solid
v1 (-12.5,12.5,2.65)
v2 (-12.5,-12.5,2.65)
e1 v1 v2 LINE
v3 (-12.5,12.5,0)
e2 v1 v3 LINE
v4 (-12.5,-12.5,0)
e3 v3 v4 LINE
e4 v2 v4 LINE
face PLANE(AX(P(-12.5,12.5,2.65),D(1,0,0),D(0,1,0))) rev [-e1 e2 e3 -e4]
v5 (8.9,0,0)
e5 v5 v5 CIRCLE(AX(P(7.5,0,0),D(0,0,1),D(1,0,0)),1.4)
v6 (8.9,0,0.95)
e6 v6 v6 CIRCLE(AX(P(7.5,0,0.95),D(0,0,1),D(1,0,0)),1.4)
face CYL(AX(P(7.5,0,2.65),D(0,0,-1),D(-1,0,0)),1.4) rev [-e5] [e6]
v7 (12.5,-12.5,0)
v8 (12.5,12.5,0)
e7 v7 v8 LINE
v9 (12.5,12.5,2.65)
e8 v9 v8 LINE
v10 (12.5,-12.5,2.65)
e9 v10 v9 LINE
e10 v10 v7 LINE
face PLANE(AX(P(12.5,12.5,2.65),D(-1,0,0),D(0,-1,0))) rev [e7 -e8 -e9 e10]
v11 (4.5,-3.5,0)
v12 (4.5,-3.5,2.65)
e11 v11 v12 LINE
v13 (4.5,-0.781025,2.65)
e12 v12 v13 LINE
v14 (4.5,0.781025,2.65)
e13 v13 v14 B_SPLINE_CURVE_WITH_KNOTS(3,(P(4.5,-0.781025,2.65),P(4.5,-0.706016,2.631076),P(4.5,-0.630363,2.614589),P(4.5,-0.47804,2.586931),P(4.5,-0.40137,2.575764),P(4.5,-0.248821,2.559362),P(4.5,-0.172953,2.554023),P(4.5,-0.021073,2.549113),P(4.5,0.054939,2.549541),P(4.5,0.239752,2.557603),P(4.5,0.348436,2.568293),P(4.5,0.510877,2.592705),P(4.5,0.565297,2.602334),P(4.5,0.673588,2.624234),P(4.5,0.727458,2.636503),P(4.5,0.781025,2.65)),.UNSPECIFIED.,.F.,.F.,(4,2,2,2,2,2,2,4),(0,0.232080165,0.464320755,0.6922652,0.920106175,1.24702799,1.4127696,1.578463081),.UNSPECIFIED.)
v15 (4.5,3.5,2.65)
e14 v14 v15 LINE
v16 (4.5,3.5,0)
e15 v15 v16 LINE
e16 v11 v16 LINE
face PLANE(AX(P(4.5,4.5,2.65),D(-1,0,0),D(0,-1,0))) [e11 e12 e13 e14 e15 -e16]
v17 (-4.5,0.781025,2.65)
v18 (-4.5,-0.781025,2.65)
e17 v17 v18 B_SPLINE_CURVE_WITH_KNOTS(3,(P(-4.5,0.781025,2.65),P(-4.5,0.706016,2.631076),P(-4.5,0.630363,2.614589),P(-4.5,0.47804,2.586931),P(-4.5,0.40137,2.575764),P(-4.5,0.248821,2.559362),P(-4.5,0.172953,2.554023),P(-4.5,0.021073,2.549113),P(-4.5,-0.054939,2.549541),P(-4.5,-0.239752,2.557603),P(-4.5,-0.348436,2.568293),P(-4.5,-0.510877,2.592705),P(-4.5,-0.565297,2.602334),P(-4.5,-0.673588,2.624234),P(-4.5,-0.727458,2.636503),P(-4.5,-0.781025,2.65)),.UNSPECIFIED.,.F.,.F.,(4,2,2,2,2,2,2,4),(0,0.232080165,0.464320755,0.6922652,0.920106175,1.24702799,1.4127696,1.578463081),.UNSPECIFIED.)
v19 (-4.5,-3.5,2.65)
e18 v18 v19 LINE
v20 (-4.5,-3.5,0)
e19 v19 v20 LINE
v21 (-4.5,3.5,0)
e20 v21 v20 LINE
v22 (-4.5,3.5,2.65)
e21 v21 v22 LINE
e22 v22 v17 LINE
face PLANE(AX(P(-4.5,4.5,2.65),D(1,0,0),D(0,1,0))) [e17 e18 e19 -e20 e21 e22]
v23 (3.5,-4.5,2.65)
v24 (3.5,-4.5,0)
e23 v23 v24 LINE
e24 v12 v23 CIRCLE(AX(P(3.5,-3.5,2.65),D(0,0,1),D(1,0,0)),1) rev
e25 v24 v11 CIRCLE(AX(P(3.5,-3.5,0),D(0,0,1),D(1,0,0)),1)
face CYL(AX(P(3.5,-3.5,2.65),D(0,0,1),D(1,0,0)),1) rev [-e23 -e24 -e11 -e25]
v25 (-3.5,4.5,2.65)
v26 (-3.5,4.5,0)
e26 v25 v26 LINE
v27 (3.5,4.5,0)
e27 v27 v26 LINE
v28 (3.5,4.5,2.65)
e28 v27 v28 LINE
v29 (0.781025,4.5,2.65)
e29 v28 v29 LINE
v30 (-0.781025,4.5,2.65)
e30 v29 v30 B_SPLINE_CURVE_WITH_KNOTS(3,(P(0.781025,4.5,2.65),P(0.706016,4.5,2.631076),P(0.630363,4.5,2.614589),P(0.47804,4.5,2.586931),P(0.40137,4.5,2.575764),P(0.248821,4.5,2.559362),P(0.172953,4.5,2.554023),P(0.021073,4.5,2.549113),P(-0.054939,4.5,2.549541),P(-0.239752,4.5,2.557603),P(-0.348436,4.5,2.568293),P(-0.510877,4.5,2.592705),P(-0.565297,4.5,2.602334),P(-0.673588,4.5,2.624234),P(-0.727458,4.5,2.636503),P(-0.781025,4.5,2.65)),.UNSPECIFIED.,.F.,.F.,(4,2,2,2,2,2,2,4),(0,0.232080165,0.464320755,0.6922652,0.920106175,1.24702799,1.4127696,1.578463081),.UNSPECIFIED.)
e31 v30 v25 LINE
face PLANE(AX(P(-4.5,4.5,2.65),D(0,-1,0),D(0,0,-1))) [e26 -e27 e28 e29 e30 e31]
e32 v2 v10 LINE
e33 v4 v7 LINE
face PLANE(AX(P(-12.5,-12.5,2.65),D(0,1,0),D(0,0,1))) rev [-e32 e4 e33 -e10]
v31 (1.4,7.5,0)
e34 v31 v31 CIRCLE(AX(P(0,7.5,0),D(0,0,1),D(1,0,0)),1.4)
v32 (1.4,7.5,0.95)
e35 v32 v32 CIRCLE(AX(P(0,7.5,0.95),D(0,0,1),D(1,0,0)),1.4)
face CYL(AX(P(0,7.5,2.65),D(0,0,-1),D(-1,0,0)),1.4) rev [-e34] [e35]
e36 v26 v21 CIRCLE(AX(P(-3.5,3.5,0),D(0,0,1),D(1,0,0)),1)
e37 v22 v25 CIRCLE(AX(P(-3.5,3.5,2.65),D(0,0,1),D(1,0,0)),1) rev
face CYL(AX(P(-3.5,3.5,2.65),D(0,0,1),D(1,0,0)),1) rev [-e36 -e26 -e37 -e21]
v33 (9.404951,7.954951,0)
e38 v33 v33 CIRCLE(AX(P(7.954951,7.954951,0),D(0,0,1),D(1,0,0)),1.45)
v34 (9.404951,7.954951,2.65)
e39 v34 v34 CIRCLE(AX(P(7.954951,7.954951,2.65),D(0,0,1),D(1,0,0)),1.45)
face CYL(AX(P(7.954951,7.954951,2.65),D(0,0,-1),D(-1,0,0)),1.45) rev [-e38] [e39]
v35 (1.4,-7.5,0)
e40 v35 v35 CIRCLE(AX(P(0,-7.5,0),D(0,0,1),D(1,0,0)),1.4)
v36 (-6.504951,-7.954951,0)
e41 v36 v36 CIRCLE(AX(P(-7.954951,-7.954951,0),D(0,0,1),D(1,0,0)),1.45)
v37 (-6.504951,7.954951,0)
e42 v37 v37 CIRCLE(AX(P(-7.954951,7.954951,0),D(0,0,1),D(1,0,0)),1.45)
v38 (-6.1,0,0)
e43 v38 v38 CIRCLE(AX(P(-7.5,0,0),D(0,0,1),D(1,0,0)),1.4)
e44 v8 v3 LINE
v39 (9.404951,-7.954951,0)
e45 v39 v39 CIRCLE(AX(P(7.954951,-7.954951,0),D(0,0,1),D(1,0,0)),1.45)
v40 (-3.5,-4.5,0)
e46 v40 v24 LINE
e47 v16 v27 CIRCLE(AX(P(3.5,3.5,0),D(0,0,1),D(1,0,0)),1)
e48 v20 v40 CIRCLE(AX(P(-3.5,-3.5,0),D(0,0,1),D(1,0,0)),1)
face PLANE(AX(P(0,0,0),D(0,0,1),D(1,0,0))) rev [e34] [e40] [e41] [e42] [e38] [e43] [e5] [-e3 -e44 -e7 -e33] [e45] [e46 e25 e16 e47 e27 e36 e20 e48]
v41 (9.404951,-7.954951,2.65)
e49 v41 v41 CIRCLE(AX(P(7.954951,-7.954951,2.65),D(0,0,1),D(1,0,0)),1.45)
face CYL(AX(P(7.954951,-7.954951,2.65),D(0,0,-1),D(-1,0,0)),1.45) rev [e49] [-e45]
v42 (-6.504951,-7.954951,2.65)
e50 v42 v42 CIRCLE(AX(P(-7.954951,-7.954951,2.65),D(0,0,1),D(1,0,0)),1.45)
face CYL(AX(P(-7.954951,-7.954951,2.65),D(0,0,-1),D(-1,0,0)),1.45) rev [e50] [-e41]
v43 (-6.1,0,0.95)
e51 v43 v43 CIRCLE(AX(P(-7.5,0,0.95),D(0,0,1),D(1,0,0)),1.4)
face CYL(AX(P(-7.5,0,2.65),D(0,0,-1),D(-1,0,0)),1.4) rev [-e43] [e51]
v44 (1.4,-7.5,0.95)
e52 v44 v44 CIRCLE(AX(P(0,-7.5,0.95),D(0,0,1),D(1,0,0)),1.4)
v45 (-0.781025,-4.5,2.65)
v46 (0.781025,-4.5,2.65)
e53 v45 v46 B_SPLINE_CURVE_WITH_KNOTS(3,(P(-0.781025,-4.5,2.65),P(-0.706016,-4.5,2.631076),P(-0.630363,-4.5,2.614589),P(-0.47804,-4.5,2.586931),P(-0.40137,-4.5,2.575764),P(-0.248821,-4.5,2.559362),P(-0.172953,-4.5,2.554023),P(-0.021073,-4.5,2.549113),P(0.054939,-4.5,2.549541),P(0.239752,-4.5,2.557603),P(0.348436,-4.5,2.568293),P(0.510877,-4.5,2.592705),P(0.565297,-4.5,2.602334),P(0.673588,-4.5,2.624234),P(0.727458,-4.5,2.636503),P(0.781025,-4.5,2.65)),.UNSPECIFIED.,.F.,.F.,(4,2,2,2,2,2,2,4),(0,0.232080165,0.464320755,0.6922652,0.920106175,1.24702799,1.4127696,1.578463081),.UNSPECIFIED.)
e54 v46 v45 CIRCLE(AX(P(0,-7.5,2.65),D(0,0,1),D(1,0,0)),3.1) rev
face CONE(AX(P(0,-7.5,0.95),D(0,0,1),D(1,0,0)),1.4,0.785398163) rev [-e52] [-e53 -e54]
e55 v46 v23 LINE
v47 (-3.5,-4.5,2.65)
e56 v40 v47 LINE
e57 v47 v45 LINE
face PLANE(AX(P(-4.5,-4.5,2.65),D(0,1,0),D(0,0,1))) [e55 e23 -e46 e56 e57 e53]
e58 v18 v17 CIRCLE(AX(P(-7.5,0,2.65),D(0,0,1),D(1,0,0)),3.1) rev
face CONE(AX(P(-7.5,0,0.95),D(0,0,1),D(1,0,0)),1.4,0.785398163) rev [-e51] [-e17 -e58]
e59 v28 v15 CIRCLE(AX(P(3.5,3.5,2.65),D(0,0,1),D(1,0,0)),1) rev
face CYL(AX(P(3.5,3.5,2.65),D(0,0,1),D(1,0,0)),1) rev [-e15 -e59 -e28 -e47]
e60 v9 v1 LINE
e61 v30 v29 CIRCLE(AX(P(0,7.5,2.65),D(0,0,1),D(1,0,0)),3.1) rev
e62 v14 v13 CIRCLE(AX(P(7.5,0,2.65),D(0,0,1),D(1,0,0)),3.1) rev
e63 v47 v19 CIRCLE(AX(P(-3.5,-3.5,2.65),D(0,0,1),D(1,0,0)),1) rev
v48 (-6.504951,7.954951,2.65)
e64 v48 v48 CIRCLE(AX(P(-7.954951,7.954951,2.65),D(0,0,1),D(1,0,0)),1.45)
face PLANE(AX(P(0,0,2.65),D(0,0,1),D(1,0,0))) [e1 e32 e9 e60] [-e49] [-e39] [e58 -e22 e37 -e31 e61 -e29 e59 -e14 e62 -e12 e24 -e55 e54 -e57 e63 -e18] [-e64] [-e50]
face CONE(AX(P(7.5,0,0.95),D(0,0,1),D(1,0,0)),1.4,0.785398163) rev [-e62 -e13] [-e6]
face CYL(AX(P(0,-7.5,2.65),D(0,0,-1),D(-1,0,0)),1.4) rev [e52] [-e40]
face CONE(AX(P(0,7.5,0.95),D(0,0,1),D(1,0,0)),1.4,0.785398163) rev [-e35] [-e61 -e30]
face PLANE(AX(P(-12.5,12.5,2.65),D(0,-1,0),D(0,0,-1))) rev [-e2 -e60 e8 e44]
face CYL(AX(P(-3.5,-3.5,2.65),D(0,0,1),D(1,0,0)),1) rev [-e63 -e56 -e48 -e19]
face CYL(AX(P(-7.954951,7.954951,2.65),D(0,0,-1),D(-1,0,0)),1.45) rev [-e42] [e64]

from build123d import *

# Parameters (mm, degrees)
SKETCH_1_W      = 25
SKETCH_1_H      = 25
SKETCH_1_R      = 1.4
SKETCH_1_R_2    = 1.45
SKETCH_1_W_2    = 9
SKETCH_1_H_2    = 9
EXTRUDE_1_DEPTH = 2.65
CHAMFER_1_SIZE  = 1.7
FILLET_1_R      = 1


with BuildPart() as part:
    # 草图1 → 凸台-拉伸1 (new body)
    with BuildSketch(Plane.XY):
        Rectangle(SKETCH_1_W, SKETCH_1_H)
        with Locations((0, 7.5)):
            Circle(SKETCH_1_R, mode=Mode.SUBTRACT)
        with Locations((7.5, 0)):
            Circle(SKETCH_1_R, mode=Mode.SUBTRACT)
        with Locations((0, -7.5)):
            Circle(SKETCH_1_R, mode=Mode.SUBTRACT)
        with Locations((-7.5, 0)):
            Circle(SKETCH_1_R, mode=Mode.SUBTRACT)
        with Locations((7.954951288, 7.954951288)):
            Circle(SKETCH_1_R_2, mode=Mode.SUBTRACT)
        with Locations((7.954951288, -7.954951288)):
            Circle(SKETCH_1_R_2, mode=Mode.SUBTRACT)
        with Locations((-7.954951288, -7.954951288)):
            Circle(SKETCH_1_R_2, mode=Mode.SUBTRACT)
        with Locations((-7.954951288, 7.954951288)):
            Circle(SKETCH_1_R_2, mode=Mode.SUBTRACT)
        Rectangle(SKETCH_1_W_2, SKETCH_1_H_2, mode=Mode.SUBTRACT)
    extrude(amount=EXTRUDE_1_DEPTH)

    # 倒角1
    # the kernel refuses this chamfer: 1.7 mm, written as the material it takes off along each edge
    with BuildSketch(Plane(origin=(0, 7.5, 2.65), x_dir=(1, 0, 0), z_dir=(0, -1, 0))) as chamfer_1_piece_1:
        Polygon((1.4, -CHAMFER_1_SIZE), (1.4 + CHAMFER_1_SIZE, 0), (1.4, 0), align=None)
    revolve(axis=Axis((0, 7.5, 2.65), (0, 0, 1)), mode=Mode.SUBTRACT)
    with BuildSketch(Plane(origin=(7.5, 0, 2.65), x_dir=(1, 0, 0), z_dir=(0, -1, 0))) as chamfer_1_piece_2:
        Polygon((1.4, -CHAMFER_1_SIZE), (1.4 + CHAMFER_1_SIZE, 0), (1.4, 0), align=None)
    revolve(axis=Axis((7.5, 0, 2.65), (0, 0, 1)), mode=Mode.SUBTRACT)
    with BuildSketch(Plane(origin=(0, -7.5, 2.65), x_dir=(1, 0, 0), z_dir=(0, -1, 0))) as chamfer_1_piece_3:
        Polygon((1.4, -CHAMFER_1_SIZE), (1.4 + CHAMFER_1_SIZE, 0), (1.4, 0), align=None)
    revolve(axis=Axis((0, -7.5, 2.65), (0, 0, 1)), mode=Mode.SUBTRACT)
    with BuildSketch(Plane(origin=(-7.5, 0, 2.65), x_dir=(1, 0, 0), z_dir=(0, -1, 0))) as chamfer_1_piece_4:
        Polygon((1.4, -CHAMFER_1_SIZE), (1.4 + CHAMFER_1_SIZE, 0), (1.4, 0), align=None)
    revolve(axis=Axis((-7.5, 0, 2.65), (0, 0, 1)), mode=Mode.SUBTRACT)

    # 圆角1
    fillet_1_edges = [part.edges().sort_by_distance(p)[0] for p in [
        (4.5, -4.5, 1.325),
        (4.5, 4.5, 1.325),
        (-4.5, 4.5, 1.325),
        (-4.5, -4.5, 1.325),
    ]]
    fillet(fillet_1_edges, radius=FILLET_1_R)


solid = part.part
